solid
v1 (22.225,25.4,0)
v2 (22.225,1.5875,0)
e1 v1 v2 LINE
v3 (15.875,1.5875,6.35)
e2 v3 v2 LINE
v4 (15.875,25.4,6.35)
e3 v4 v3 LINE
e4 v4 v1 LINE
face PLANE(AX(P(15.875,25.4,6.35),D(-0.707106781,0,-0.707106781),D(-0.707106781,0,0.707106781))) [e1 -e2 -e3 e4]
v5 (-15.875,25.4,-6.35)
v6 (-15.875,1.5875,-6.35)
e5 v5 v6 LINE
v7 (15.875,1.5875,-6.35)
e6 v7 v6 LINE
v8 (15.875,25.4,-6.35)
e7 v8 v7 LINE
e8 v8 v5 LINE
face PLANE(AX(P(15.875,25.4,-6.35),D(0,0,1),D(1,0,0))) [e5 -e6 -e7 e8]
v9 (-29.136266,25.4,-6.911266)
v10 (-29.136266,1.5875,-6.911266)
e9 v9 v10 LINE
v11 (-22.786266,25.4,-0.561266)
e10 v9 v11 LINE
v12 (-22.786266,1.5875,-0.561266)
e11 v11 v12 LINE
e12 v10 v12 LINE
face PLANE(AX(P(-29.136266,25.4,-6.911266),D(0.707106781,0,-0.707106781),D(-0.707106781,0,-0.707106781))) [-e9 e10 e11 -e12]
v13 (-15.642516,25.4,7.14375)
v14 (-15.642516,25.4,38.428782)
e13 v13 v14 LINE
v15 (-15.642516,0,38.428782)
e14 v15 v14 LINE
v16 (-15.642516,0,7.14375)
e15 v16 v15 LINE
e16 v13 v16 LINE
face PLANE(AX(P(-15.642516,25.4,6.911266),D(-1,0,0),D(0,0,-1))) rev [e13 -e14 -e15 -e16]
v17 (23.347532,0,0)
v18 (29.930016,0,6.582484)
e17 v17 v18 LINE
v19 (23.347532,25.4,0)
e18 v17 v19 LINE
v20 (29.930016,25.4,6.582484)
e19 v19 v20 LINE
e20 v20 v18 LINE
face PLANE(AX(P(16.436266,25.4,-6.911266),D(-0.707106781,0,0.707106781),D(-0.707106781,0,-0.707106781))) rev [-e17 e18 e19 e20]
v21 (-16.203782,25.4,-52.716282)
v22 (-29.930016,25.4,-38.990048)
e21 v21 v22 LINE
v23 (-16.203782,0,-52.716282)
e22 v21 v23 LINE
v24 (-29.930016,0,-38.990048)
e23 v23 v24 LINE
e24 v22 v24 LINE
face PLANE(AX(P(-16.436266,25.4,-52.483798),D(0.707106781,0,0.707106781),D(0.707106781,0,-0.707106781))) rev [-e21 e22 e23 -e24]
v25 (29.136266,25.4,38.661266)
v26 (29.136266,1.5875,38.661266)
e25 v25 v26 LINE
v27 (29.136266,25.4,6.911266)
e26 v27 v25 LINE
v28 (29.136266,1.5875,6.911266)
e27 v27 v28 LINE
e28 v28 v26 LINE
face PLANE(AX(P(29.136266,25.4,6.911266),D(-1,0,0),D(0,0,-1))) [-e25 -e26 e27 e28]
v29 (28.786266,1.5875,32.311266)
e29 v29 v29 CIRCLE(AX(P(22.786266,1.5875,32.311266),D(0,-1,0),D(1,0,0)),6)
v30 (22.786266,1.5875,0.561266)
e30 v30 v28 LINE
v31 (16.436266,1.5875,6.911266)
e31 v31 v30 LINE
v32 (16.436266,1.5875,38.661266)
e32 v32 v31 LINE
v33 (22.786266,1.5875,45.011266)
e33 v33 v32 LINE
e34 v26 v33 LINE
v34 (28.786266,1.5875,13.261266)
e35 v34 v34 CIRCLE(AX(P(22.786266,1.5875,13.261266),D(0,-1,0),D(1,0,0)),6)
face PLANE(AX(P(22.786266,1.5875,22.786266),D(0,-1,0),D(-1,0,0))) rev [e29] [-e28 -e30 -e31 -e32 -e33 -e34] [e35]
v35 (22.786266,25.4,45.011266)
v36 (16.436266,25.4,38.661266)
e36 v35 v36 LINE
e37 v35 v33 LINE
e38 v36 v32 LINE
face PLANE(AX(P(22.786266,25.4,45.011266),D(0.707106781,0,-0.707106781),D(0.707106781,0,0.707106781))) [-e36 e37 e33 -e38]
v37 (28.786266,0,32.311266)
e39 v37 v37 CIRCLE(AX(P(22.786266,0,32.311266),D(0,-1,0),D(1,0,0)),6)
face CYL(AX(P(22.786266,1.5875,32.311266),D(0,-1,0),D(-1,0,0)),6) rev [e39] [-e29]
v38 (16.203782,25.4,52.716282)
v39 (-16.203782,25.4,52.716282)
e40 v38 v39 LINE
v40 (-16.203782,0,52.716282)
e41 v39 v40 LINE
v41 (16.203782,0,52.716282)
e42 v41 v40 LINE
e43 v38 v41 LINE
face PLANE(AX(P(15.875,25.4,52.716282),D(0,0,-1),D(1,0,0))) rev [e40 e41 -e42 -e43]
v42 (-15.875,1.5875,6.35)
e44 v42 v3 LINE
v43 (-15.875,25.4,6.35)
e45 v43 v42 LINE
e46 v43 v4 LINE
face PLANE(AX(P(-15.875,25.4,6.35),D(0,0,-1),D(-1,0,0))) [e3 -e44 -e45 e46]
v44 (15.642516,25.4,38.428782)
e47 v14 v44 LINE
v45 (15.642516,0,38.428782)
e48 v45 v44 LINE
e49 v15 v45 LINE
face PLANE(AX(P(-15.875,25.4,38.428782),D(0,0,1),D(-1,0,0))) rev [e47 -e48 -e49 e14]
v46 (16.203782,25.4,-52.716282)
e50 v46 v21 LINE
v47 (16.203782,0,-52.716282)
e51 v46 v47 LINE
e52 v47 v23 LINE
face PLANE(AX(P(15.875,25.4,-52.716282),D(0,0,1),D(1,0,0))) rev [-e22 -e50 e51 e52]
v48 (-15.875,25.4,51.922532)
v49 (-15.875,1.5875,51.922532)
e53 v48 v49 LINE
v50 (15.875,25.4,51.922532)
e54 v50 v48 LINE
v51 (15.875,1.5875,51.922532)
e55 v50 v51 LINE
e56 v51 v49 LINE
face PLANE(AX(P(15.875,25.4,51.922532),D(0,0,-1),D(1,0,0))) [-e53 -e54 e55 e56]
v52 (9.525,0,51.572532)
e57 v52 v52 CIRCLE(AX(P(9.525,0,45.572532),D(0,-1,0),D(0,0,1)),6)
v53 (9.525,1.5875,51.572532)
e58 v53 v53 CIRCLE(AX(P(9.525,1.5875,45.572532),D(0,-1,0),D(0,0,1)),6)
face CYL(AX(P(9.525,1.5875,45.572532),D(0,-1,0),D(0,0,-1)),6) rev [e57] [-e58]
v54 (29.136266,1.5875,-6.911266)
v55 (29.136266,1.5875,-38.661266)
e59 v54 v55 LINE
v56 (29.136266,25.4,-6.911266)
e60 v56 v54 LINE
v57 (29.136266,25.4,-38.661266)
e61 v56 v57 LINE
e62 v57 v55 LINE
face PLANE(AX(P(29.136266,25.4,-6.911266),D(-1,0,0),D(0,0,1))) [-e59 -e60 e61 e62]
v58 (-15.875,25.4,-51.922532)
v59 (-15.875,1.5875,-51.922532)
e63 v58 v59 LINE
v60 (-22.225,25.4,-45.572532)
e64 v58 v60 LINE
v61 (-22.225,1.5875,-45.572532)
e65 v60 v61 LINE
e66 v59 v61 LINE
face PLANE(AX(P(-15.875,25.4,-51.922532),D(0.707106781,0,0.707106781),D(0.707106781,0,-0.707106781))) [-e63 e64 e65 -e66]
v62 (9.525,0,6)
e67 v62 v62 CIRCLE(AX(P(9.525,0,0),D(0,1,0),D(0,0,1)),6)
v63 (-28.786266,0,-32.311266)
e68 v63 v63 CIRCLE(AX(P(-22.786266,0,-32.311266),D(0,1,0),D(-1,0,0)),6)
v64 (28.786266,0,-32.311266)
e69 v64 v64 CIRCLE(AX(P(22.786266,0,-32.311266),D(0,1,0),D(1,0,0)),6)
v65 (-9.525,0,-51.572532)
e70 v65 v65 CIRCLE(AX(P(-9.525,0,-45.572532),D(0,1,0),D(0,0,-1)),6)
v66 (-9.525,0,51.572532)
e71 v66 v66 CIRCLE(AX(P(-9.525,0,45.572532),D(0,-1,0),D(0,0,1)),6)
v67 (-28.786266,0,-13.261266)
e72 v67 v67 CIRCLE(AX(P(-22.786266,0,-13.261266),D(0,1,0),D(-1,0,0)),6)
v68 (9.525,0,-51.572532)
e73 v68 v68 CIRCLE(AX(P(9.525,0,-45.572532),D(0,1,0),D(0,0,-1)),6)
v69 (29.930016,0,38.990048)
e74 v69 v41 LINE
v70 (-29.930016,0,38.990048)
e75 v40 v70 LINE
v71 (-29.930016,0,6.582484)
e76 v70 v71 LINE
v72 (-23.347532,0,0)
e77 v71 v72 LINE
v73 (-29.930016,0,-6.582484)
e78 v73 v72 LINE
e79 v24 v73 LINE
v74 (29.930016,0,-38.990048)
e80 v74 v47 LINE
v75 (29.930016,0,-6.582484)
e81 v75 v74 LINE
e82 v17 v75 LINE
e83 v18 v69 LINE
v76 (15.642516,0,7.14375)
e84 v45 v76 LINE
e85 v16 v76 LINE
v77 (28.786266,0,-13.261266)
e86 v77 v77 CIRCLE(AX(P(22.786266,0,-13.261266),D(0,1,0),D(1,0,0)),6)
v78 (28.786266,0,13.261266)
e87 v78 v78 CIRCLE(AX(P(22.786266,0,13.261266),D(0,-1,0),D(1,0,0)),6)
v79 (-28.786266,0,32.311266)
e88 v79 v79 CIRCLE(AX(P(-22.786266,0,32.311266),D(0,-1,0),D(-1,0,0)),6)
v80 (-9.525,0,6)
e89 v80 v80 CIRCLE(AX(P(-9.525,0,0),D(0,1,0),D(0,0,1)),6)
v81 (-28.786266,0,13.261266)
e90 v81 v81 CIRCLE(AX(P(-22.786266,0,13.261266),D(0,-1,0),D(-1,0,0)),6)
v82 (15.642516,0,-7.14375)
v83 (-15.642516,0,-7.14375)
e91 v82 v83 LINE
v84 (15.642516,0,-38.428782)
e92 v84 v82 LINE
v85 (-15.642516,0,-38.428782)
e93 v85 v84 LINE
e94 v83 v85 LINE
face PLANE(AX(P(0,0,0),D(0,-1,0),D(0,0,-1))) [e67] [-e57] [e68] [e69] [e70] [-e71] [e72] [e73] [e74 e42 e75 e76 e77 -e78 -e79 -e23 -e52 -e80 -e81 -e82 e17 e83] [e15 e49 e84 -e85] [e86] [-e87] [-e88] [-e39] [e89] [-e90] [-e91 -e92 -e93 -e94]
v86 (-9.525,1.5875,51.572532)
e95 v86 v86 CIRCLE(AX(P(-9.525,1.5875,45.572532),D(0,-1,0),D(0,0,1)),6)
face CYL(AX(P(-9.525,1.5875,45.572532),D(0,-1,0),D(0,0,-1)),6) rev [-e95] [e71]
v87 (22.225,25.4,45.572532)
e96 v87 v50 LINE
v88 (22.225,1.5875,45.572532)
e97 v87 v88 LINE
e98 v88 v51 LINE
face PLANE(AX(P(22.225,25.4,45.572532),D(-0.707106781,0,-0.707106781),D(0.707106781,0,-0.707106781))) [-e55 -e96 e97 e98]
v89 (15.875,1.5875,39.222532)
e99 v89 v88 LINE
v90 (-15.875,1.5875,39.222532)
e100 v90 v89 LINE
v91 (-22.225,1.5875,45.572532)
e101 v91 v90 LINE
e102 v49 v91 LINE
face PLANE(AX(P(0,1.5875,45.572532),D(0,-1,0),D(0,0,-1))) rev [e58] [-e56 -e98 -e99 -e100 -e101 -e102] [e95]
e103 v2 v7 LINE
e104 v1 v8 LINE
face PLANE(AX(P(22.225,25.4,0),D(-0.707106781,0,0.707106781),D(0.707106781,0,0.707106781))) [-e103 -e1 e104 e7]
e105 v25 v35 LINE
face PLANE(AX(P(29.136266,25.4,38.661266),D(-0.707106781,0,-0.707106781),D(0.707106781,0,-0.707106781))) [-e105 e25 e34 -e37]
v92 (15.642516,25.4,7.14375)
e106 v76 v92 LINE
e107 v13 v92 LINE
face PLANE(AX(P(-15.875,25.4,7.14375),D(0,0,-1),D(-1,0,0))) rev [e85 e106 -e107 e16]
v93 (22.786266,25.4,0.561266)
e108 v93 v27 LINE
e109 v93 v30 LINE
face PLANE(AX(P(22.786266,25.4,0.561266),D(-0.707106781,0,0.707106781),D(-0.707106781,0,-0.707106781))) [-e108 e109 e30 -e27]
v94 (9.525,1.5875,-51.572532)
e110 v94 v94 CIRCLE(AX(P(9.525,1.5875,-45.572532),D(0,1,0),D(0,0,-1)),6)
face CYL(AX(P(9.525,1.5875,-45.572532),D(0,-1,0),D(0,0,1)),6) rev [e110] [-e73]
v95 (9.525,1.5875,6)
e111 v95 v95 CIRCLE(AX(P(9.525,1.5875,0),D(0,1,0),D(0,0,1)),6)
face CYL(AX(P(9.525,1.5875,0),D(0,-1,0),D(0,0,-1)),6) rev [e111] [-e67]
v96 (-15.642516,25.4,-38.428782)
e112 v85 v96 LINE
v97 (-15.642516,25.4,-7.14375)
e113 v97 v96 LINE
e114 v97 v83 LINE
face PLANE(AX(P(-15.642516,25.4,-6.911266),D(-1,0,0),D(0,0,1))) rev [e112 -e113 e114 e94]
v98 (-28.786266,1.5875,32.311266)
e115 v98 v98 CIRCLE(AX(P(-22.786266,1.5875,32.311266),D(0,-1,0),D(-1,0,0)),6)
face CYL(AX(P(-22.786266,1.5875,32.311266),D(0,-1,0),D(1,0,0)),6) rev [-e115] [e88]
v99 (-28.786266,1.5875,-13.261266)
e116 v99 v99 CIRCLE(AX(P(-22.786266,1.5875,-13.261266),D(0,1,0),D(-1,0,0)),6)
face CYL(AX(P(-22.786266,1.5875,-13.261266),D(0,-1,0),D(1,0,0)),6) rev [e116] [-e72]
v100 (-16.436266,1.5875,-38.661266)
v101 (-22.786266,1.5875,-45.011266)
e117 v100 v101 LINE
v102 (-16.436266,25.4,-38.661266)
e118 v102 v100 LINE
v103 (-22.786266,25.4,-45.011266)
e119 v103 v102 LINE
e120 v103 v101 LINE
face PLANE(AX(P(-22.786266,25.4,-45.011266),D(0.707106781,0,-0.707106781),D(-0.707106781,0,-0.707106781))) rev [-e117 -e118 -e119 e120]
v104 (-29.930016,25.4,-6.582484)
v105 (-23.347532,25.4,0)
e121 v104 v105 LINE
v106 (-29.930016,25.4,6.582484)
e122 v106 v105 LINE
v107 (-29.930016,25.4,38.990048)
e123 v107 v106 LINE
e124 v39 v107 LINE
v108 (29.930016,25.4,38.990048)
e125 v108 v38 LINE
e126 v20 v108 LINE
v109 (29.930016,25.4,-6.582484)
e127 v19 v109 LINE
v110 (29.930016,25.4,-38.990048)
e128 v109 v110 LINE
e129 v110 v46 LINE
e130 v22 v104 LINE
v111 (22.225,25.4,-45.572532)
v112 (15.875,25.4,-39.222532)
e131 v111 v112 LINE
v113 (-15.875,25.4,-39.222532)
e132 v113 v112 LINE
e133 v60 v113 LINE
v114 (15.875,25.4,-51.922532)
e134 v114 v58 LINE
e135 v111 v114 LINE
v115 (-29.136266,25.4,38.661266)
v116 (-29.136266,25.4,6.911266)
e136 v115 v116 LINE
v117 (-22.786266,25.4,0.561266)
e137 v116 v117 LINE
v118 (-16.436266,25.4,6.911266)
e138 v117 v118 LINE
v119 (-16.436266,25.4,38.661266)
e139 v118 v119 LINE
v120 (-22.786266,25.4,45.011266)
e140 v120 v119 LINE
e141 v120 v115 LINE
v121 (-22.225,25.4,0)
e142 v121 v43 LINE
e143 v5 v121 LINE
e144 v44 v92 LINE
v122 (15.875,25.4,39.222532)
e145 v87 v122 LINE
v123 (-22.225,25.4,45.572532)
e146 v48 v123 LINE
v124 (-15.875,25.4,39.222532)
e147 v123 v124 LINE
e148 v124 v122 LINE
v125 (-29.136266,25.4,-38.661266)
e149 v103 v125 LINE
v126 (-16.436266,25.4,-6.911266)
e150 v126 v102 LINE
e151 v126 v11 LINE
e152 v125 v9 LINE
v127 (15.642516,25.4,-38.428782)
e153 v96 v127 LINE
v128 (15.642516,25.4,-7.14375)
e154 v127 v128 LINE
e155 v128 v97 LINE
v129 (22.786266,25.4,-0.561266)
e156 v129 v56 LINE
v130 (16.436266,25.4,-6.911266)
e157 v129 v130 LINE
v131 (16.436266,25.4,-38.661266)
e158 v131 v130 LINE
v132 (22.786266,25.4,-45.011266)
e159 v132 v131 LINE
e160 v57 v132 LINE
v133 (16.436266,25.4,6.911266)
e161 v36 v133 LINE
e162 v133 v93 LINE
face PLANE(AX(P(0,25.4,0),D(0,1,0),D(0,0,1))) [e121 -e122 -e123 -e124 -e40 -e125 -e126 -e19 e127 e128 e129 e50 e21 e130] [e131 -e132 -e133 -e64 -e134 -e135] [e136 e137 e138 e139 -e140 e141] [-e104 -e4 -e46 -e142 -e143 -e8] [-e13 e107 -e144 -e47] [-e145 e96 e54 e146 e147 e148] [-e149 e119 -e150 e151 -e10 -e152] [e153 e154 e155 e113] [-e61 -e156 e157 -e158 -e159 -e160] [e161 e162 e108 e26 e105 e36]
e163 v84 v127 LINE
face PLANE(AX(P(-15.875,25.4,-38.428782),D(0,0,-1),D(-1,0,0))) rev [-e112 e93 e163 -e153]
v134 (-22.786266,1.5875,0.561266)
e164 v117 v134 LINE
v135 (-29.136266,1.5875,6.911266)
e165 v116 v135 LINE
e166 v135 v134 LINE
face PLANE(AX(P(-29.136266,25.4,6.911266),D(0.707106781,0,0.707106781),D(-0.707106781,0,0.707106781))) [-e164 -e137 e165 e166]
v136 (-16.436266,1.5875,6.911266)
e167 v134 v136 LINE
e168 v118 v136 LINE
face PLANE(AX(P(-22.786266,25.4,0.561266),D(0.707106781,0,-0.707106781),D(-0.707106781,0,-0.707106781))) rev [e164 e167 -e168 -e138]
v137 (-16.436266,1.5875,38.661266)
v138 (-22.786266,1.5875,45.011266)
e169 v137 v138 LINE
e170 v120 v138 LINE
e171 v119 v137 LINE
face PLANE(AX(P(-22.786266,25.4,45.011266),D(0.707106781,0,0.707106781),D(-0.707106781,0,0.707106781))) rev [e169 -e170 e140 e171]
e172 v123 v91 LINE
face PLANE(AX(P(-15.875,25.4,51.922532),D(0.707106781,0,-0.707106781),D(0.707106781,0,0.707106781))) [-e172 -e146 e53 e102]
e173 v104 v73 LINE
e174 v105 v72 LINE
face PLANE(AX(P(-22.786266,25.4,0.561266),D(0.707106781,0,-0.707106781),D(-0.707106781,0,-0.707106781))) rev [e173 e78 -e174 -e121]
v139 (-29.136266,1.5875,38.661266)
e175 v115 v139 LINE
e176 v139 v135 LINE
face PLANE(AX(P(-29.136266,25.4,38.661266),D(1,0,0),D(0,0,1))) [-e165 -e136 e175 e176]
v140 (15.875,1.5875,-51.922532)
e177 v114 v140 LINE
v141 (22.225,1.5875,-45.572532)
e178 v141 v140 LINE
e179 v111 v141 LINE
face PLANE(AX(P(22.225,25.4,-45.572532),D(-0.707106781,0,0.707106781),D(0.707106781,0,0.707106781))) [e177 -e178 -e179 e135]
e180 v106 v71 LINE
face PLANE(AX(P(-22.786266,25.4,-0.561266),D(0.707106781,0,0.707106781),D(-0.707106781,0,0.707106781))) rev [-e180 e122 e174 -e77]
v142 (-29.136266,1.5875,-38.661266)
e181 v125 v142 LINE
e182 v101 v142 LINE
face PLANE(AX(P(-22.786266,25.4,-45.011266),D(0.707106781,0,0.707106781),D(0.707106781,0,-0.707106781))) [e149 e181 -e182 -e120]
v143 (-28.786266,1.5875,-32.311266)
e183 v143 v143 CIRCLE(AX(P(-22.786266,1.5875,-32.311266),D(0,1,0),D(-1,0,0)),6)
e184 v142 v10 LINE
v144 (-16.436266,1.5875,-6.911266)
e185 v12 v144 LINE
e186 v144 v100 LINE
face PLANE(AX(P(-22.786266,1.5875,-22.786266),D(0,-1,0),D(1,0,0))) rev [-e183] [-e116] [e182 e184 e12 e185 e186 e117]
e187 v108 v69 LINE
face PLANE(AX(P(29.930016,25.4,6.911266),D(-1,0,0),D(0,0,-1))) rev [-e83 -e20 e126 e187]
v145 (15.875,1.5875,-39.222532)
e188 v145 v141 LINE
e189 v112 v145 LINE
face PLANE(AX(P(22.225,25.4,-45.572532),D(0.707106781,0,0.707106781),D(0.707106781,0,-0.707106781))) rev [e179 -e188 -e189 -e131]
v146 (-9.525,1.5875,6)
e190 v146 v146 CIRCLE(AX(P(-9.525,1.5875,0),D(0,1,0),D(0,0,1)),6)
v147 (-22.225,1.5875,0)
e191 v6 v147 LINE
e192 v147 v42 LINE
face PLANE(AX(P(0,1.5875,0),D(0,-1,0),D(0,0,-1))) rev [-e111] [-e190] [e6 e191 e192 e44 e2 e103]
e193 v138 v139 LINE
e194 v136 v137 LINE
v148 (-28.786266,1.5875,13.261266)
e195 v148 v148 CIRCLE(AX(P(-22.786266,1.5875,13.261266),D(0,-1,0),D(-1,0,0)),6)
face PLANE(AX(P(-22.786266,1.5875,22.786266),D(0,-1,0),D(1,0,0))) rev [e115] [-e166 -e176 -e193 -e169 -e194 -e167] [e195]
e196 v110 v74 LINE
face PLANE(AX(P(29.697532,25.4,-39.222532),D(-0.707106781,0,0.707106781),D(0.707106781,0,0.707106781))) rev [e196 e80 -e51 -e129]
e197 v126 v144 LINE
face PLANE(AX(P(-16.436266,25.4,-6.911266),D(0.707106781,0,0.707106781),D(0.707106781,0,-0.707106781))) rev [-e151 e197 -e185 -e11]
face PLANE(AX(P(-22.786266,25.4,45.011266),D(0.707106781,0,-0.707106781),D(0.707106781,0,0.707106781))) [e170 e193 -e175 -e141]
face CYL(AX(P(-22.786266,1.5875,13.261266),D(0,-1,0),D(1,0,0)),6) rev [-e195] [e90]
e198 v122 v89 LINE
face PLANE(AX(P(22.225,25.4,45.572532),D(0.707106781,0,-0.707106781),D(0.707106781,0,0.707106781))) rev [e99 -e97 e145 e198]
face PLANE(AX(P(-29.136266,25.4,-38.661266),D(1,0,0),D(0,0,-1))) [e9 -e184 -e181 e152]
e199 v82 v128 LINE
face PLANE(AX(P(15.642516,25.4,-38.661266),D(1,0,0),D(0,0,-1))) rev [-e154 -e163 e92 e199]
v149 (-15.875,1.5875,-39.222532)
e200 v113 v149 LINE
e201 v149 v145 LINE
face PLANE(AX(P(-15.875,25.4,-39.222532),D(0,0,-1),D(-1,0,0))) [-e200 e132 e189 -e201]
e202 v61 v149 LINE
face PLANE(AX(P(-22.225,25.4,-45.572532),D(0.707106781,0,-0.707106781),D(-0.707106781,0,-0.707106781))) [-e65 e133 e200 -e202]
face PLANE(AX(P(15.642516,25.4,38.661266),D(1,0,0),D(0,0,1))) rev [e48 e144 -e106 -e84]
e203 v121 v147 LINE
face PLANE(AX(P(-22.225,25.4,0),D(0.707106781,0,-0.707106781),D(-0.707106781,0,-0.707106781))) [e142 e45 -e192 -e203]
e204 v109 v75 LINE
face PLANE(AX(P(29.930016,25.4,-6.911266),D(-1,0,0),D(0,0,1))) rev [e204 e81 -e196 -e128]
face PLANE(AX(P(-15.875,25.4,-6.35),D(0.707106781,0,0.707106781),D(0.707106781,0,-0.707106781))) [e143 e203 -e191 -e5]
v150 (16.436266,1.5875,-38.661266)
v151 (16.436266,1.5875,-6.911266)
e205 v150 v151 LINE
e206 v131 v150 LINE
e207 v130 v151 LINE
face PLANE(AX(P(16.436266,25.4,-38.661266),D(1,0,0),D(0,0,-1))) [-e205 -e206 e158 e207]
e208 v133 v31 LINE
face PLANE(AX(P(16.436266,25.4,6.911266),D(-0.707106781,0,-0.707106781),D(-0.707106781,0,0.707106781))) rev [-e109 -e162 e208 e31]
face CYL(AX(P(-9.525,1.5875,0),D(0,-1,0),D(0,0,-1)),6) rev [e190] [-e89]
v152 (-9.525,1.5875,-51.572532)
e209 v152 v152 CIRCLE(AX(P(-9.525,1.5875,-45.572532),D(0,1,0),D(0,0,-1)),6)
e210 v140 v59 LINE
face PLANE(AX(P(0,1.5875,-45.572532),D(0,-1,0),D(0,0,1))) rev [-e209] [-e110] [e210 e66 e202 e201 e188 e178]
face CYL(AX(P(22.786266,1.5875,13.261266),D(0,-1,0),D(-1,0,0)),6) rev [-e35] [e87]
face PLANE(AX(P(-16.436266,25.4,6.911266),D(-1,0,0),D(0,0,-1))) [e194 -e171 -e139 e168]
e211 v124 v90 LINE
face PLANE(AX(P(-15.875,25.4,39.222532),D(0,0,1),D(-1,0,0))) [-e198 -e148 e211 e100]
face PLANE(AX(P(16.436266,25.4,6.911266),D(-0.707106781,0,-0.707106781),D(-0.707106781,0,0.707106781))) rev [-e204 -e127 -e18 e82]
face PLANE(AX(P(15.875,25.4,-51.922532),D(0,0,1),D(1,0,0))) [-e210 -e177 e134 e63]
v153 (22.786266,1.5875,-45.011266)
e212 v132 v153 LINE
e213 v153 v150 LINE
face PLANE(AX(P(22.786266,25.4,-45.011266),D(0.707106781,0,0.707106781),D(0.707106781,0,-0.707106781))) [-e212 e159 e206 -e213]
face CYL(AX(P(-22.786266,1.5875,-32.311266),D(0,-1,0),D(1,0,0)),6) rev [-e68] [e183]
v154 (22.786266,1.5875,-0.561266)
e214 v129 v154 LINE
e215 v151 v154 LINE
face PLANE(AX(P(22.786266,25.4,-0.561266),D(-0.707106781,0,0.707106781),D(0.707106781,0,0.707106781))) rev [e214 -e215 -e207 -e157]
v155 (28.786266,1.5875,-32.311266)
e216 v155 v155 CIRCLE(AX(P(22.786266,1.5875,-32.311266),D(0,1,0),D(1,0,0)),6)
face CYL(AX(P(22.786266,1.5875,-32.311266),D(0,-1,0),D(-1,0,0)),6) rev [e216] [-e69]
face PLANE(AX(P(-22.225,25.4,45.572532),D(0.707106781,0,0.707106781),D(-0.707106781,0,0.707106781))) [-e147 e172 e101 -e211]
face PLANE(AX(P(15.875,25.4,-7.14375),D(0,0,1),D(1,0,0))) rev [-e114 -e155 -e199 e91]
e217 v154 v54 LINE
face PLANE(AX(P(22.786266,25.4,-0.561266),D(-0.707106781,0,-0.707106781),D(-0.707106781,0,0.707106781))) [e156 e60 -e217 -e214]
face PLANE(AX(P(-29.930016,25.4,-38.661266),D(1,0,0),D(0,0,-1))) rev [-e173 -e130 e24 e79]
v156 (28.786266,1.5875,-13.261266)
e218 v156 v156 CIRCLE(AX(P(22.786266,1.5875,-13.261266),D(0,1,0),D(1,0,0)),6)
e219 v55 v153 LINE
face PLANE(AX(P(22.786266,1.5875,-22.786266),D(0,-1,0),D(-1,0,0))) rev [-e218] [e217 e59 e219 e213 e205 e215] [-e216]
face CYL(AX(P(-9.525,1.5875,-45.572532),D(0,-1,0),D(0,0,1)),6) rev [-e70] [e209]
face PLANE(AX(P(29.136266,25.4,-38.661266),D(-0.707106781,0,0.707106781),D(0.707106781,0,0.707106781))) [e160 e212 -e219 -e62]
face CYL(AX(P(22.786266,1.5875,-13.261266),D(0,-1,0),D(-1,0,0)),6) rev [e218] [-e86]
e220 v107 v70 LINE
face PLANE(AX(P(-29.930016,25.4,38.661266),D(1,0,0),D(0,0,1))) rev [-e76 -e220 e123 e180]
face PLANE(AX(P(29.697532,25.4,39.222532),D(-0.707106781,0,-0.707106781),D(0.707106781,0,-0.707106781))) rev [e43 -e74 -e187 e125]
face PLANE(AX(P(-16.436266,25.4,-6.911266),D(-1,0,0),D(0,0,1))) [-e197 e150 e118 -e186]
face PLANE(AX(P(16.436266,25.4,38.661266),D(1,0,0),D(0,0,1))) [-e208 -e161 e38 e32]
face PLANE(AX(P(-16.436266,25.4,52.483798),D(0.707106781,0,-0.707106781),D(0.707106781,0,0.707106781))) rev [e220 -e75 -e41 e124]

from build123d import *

# Parameters (mm, degrees)
SKETCH1_R               = 6
BOSS_EXTRUDE1_DEPTH     = 1.5875
EXTRUDE_THIN1_DEPTH     = 25.4
CIRPATTERN1_COUNT       = 4
MIRROR1_COPY_1_SKETCH_R = 6
MIRROR1_COPY_1_DEPTH    = 1.5875
MIRROR1_COPY_2_SKETCH_R = 6
MIRROR1_COPY_2_DEPTH    = 1.5875
MIRROR1_COPY_3_SKETCH_R = 6
MIRROR1_COPY_3_DEPTH    = 1.5875
MIRROR1_COPY_4_DEPTH    = 25.4
MIRROR1_COPY_5_DEPTH    = 25.4
MIRROR1_COPY_6_DEPTH    = 25.4
MIRROR1_COPY_7_SKETCH_R = 6
MIRROR1_COPY_7_DEPTH    = 1.5875
MIRROR1_COPY_8_DEPTH    = 25.4


with BuildPart() as part:
    # Sketch1 → Boss-Extrude1 (new body)
    with BuildSketch(Plane(origin=(0, 0, 0), x_dir=(1, 0, 0), z_dir=(0, 1, 0))):
        Polygon((-22.225, 0), (-15.875, 6.35), (15.875, 6.35), (22.225, 0), (15.875, -6.35), (-15.875, -6.35), align=None)
        with Locations((-9.525, 0)):
            Circle(SKETCH1_R, mode=Mode.SUBTRACT)
        with Locations((9.525, 0)):
            Circle(SKETCH1_R, mode=Mode.SUBTRACT)
    boss_extrude1 = extrude(amount=BOSS_EXTRUDE1_DEPTH)

    # Sketch2 → Extrude-Thin1 (add)
    with BuildSketch(Plane(origin=(0, 0, 0), x_dir=(1, 0, 0), z_dir=(0, 1, 0))):
        Polygon((-23.347532015, 0), (-16.203782015, -7.14375), (16.203782015, -7.14375), (23.347532015, 0), (16.203782015, 7.14375), (-16.203782015, 7.14375), align=None)
        Polygon((-22.225, 0), (-15.875, -6.35), (15.875, -6.35), (22.225, 0), (15.875, 6.35), (-15.875, 6.35), align=None, mode=Mode.SUBTRACT)
    extrude_thin1 = extrude(amount=EXTRUDE_THIN1_DEPTH)

    # CirPattern1: Boss-Extrude1, Extrude-Thin1 ×4 about axis
    cirpattern1_axis = Axis((0, 0, -22.786266008), (0, 1, 0))
    add([boss_extrude1.rotate(cirpattern1_axis, i * 360 / CIRPATTERN1_COUNT) for i in range(1, CIRPATTERN1_COUNT)])
    add([extrude_thin1.rotate(cirpattern1_axis, i * 360 / CIRPATTERN1_COUNT) for i in range(1, CIRPATTERN1_COUNT)])

    # Mirror1 copy 1 sketch → Mirror1 copy 1 (add)
    with BuildSketch(Plane(origin=(22.786266008, 0, 22.786266008), x_dir=(0, 0, 1), z_dir=(0, 1, 0))):
        Polygon((-22.225, 0), (-15.875, -6.35), (15.875, -6.35), (22.225, 0), (15.875, 6.35), (-15.875, 6.35), align=None)
        with Locations((-9.525, 0)):
            Circle(MIRROR1_COPY_1_SKETCH_R, mode=Mode.SUBTRACT)
        with Locations((9.525, 0)):
            Circle(MIRROR1_COPY_1_SKETCH_R, mode=Mode.SUBTRACT)
    extrude(amount=MIRROR1_COPY_1_DEPTH)

    # Mirror1 copy 2 sketch → Mirror1 copy 2 (add)
    with BuildSketch(Plane(origin=(0, 0, 45.572532015), x_dir=(-1, 0, 0), z_dir=(0, 1, 0))):
        Polygon((-22.225, 0), (-15.875, -6.35), (15.875, -6.35), (22.225, 0), (15.875, 6.35), (-15.875, 6.35), align=None)
        with Locations((-9.525, 0)):
            Circle(MIRROR1_COPY_2_SKETCH_R, mode=Mode.SUBTRACT)
        with Locations((9.525, 0)):
            Circle(MIRROR1_COPY_2_SKETCH_R, mode=Mode.SUBTRACT)
    extrude(amount=MIRROR1_COPY_2_DEPTH)

    # Mirror1 copy 3 sketch → Mirror1 copy 3 (add)
    with BuildSketch(Plane(origin=(-22.786266008, 0, 22.786266008), x_dir=(0, 0, -1), z_dir=(0, 1, 0))):
        Polygon((-22.225, 0), (-15.875, -6.35), (15.875, -6.35), (22.225, 0), (15.875, 6.35), (-15.875, 6.35), align=None)
        with Locations((-9.525, 0)):
            Circle(MIRROR1_COPY_3_SKETCH_R, mode=Mode.SUBTRACT)
        with Locations((9.525, 0)):
            Circle(MIRROR1_COPY_3_SKETCH_R, mode=Mode.SUBTRACT)
    extrude(amount=MIRROR1_COPY_3_DEPTH)

    # Mirror1 copy 4 sketch → Mirror1 copy 4 (add)
    with BuildSketch(Plane(origin=(22.786266008, 0, 22.786266008), x_dir=(0, 0, 1), z_dir=(0, 1, 0))):
        Polygon((-23.347532015, 0), (-16.203782015, 7.14375), (16.203782015, 7.14375), (23.347532015, 0), (16.203782015, -7.14375), (-16.203782015, -7.14375), align=None)
        Polygon((-22.225, 0), (-15.875, 6.35), (15.875, 6.35), (22.225, 0), (15.875, -6.35), (-15.875, -6.35), align=None, mode=Mode.SUBTRACT)
    extrude(amount=MIRROR1_COPY_4_DEPTH)

    # Mirror1 copy 5 sketch → Mirror1 copy 5 (add)
    with BuildSketch(Plane(origin=(0, 0, 45.572532015), x_dir=(-1, 0, 0), z_dir=(0, 1, 0))):
        Polygon((-23.347532015, 0), (-16.203782015, 7.14375), (16.203782015, 7.14375), (23.347532015, 0), (16.203782015, -7.14375), (-16.203782015, -7.14375), align=None)
        Polygon((-22.225, 0), (-15.875, 6.35), (15.875, 6.35), (22.225, 0), (15.875, -6.35), (-15.875, -6.35), align=None, mode=Mode.SUBTRACT)
    extrude(amount=MIRROR1_COPY_5_DEPTH)

    # Mirror1 copy 6 sketch → Mirror1 copy 6 (add)
    with BuildSketch(Plane(origin=(-22.786266008, 0, 22.786266008), x_dir=(0, 0, -1), z_dir=(0, 1, 0))):
        Polygon((-23.347532015, 0), (-16.203782015, 7.14375), (16.203782015, 7.14375), (23.347532015, 0), (16.203782015, -7.14375), (-16.203782015, -7.14375), align=None)
        Polygon((-22.225, 0), (-15.875, 6.35), (15.875, 6.35), (22.225, 0), (15.875, -6.35), (-15.875, -6.35), align=None, mode=Mode.SUBTRACT)
    extrude(amount=MIRROR1_COPY_6_DEPTH)

    # Mirror1 copy 7 sketch → Mirror1 copy 7 (add)
    with BuildSketch(Plane(origin=(0, 0, 0), x_dir=(1, 0, 0), z_dir=(0, 1, 0))):
        Polygon((-22.225, 0), (-15.875, -6.35), (15.875, -6.35), (22.225, 0), (15.875, 6.35), (-15.875, 6.35), align=None)
        with Locations((-9.525, 0)):
            Circle(MIRROR1_COPY_7_SKETCH_R, mode=Mode.SUBTRACT)
        with Locations((9.525, 0)):
            Circle(MIRROR1_COPY_7_SKETCH_R, mode=Mode.SUBTRACT)
    extrude(amount=MIRROR1_COPY_7_DEPTH)

    # Mirror1 copy 8 sketch → Mirror1 copy 8 (add)
    with BuildSketch(Plane(origin=(0, 0, 0), x_dir=(1, 0, 0), z_dir=(0, 1, 0))):
        Polygon((-23.347532015, 0), (-16.203782015, 7.14375), (16.203782015, 7.14375), (23.347532015, 0), (16.203782015, -7.14375), (-16.203782015, -7.14375), align=None)
        Polygon((-22.225, 0), (-15.875, 6.35), (15.875, 6.35), (22.225, 0), (15.875, -6.35), (-15.875, -6.35), align=None, mode=Mode.SUBTRACT)
    extrude(amount=MIRROR1_COPY_8_DEPTH)


solid = part.part
